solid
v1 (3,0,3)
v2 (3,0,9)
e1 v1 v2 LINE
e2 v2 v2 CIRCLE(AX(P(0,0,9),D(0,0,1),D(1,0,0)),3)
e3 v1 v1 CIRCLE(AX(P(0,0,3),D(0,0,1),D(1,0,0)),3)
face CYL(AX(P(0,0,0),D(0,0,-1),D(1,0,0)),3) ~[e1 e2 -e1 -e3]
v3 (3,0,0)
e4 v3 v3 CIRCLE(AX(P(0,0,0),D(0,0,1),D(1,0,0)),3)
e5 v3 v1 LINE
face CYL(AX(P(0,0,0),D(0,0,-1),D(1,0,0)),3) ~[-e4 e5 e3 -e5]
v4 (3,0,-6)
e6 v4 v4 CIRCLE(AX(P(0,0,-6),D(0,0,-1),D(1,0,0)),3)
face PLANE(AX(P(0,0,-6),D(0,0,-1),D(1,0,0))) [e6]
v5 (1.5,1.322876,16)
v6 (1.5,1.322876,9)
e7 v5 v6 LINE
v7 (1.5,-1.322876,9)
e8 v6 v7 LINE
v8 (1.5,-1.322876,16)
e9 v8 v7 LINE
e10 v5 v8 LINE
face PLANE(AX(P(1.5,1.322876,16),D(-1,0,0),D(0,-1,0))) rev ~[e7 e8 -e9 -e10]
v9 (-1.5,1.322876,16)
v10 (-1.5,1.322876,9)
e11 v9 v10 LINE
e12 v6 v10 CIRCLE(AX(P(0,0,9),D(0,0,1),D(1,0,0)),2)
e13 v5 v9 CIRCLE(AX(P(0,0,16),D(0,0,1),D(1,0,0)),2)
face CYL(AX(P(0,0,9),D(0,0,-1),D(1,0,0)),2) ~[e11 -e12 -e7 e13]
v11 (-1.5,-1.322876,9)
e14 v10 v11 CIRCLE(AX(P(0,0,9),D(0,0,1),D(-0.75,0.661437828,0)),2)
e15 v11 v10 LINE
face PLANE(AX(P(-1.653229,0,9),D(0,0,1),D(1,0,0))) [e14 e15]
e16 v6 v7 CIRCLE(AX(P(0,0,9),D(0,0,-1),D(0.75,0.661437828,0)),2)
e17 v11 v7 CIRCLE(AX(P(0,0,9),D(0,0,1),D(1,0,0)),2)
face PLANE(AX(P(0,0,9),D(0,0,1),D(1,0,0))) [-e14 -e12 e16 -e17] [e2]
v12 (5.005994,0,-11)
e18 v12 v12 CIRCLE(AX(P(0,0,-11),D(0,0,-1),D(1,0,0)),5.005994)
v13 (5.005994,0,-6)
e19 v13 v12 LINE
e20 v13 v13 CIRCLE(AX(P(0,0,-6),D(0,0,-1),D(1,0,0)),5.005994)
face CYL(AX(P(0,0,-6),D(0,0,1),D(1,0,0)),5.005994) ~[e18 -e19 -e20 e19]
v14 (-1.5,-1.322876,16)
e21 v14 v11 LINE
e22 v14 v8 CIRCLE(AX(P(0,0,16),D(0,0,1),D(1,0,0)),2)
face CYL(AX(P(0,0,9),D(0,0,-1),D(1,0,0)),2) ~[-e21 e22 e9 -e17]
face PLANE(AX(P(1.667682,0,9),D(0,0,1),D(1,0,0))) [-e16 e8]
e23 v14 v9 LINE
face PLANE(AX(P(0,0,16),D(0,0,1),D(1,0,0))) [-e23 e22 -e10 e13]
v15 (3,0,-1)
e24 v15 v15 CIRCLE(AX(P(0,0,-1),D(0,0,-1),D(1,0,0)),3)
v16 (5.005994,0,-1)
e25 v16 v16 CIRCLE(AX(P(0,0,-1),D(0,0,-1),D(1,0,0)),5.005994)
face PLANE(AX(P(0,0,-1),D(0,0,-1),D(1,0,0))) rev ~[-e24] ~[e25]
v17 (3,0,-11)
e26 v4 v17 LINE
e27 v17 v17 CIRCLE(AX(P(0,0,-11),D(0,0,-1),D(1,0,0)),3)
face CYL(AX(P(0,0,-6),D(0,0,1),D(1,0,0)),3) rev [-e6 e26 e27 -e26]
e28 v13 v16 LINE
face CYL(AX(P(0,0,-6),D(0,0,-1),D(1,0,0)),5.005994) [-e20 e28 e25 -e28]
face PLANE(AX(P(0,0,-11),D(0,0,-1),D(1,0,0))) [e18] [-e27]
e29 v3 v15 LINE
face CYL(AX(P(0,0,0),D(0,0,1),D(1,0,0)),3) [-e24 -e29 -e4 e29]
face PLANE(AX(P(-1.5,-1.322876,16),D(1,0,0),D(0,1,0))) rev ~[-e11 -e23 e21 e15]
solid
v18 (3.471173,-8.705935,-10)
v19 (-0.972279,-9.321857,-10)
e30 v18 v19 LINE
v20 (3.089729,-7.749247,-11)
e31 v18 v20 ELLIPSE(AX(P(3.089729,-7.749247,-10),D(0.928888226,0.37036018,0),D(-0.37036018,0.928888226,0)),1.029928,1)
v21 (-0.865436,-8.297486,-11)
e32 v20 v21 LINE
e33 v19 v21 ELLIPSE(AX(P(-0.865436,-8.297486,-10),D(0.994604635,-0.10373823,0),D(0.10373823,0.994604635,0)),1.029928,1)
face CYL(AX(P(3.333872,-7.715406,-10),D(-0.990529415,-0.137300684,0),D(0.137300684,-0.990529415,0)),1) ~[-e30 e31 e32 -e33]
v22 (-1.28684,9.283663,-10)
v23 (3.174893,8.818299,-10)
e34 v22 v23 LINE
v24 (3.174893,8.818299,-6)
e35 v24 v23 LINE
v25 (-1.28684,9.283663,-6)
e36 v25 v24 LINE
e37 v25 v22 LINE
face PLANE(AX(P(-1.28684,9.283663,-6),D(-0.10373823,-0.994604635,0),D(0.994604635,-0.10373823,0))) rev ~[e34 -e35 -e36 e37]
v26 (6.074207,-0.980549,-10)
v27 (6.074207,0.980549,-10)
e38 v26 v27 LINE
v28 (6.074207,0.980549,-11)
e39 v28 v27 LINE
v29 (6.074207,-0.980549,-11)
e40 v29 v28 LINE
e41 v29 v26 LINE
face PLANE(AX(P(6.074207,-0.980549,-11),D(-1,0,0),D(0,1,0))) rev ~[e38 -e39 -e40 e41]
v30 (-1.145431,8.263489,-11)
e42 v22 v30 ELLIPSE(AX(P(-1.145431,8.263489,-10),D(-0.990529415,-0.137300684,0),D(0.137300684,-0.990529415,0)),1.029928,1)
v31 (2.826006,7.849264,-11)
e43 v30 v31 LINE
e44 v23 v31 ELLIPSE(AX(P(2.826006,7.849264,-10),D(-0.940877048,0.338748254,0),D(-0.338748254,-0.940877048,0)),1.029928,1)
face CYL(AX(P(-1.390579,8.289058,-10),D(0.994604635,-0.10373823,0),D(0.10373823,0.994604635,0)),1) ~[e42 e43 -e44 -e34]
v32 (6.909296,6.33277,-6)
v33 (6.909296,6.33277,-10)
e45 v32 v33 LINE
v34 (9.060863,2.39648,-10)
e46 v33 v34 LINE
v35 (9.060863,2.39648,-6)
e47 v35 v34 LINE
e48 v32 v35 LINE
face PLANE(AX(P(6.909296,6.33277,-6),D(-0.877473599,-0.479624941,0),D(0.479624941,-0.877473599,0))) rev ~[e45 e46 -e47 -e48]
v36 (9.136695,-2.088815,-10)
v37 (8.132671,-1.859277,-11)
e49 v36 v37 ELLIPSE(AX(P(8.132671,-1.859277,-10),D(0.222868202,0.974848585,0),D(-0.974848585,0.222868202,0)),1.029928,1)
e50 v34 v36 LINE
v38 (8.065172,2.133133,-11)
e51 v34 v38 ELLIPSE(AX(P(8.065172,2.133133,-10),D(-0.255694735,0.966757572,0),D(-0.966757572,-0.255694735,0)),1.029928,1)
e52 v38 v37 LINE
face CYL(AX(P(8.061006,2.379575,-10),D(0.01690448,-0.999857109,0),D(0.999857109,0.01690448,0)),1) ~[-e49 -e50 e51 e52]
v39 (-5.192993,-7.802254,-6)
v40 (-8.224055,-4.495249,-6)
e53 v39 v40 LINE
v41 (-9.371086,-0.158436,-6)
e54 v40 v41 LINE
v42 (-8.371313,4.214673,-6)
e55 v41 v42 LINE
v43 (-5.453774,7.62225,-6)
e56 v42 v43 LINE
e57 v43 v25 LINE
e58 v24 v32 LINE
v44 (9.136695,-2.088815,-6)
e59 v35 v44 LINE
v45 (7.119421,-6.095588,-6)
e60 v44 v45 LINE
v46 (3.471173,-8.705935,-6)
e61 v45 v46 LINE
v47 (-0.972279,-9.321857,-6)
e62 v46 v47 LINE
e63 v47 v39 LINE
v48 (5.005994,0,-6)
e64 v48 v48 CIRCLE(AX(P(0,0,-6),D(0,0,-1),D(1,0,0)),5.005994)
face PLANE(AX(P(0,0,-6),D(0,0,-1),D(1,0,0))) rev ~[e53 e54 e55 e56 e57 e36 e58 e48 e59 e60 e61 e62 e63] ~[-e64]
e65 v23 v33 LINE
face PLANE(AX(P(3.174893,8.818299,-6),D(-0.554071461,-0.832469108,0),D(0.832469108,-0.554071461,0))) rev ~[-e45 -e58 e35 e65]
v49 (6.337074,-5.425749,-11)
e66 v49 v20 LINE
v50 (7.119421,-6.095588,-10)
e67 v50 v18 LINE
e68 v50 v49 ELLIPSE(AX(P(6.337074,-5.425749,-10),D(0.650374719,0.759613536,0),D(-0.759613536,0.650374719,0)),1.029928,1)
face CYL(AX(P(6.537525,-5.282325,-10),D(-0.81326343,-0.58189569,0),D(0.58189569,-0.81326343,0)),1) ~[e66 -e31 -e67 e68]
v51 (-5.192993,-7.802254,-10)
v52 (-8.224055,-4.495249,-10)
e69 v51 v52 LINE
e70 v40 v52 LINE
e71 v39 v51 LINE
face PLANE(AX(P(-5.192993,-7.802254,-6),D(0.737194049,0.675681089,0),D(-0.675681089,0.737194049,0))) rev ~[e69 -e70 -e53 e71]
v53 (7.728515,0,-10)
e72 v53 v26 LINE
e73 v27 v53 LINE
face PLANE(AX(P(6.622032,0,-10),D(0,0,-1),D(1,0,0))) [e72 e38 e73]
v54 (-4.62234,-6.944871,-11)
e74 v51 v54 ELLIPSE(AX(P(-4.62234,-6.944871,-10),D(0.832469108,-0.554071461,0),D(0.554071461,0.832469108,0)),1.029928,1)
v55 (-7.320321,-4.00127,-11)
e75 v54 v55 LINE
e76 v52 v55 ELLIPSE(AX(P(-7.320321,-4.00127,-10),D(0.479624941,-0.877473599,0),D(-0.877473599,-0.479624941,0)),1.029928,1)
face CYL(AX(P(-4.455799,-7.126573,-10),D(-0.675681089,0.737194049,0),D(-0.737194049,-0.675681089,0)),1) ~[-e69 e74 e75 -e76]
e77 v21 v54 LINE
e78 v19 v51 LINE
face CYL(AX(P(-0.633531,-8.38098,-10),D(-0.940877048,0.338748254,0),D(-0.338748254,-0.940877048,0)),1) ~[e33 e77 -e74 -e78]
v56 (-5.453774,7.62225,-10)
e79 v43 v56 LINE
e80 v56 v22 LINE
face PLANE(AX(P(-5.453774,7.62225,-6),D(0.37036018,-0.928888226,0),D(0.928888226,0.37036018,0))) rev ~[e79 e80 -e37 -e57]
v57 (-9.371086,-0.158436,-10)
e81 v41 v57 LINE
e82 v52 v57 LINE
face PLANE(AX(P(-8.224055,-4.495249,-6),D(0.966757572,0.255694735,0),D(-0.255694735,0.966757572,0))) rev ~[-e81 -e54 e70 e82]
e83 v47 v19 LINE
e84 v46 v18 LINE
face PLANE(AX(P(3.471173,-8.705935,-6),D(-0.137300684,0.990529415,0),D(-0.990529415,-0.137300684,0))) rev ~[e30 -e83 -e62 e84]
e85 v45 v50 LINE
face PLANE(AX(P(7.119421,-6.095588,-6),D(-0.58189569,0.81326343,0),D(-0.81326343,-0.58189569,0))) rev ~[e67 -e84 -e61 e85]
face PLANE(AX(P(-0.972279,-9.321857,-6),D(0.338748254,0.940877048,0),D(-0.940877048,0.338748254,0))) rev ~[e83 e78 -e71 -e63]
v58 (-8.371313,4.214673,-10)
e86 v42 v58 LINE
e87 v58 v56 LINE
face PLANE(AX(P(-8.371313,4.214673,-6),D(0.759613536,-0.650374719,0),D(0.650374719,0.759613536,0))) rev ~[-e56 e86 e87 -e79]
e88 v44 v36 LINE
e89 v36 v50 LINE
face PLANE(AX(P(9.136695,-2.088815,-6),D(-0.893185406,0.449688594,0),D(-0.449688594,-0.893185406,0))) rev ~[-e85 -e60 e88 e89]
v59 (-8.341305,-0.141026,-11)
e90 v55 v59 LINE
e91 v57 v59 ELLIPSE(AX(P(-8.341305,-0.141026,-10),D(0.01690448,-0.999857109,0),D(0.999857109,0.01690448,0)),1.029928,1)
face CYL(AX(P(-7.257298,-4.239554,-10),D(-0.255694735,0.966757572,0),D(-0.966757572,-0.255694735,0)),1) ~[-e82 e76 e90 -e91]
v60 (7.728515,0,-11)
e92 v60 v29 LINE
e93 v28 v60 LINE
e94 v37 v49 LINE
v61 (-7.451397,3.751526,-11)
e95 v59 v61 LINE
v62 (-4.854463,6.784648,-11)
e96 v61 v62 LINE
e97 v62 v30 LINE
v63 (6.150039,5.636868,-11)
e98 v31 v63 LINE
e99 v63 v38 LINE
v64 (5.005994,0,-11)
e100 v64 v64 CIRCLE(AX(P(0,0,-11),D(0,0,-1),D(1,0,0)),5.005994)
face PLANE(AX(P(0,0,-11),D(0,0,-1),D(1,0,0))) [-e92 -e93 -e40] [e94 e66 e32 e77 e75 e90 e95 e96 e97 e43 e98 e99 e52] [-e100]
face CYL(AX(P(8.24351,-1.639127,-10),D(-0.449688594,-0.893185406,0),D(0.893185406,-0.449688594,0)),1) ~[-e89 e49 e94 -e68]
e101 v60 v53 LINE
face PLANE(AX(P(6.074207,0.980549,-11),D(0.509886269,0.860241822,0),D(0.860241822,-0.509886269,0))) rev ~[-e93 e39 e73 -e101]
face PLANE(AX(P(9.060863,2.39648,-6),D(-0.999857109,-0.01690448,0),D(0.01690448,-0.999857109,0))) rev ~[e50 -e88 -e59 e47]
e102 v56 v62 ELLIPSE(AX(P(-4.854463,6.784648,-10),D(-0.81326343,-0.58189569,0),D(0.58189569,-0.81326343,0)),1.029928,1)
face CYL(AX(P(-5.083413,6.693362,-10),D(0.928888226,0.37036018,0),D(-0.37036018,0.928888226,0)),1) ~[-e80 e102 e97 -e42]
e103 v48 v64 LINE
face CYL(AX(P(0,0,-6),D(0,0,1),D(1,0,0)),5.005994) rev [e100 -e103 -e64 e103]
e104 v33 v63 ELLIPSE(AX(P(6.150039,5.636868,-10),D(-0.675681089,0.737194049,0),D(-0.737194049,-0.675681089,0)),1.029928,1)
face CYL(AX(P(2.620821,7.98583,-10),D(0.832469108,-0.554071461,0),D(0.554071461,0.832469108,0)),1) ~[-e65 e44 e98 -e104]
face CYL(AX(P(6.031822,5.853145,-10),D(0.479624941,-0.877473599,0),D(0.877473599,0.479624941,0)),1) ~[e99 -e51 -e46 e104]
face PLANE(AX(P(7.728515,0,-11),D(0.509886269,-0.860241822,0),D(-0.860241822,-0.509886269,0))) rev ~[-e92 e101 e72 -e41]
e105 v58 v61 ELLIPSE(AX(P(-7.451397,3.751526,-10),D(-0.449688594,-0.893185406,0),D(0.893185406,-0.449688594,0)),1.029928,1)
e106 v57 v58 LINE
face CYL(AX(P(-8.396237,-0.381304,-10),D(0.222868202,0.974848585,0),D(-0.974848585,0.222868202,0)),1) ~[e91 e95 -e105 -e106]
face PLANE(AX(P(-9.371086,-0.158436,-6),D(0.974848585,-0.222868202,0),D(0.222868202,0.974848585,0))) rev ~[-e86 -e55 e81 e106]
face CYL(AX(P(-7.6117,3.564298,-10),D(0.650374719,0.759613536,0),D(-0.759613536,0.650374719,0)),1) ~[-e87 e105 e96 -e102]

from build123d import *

# Parameters (mm, degrees)
F0_R           = 3
F1_DEPTH       = 9
F1_FACE_R      = 3
F2_DEPTH       = 6
F3_R           = 2
F4_DEPTH       = 7
F3_R_2         = 3
F5_DEPTH       = 7
F7_DEPTH       = 7
F8_R           = 5.0059936483
F9_DEPTH       = 5
F10_R          = 1
F8_R_2         = 3
F12_DEPTH      = 5
F12_DEPTH_BACK = 5
F13_DEPTH      = 1


with BuildPart() as f1:
    # F0 (on Top) → F1 (new body)
    with BuildSketch(Plane.XY):
        Circle(F0_R)
    extrude(amount=F1_DEPTH)

    # F0 (on Top) + F1_face (on face) → F2 (join)
    with BuildSketch(Plane.XY):
        Circle(F0_R)
    with BuildSketch(Plane.XY.offset(9)):
        Circle(F1_FACE_R)
    extrude(amount=-F2_DEPTH)

    # F3 (on face) → F4 (join)
    with BuildSketch(Plane.XY.offset(9)):
        Circle(F3_R)
    extrude(amount=F4_DEPTH)

    # F3 (on face) → F5 (cut)
    with BuildSketch(Plane.XY.offset(9)):
        Circle(F3_R_2)
        Circle(F3_R, mode=Mode.SUBTRACT)
    extrude(amount=F5_DEPTH, mode=Mode.SUBTRACT)

    # F6 (on face) → F7 (cut)
    with BuildSketch(Plane.XY.offset(16)):
        with BuildLine():
            Line((-1.5, -1.3228756555), (-1.5, 1.3228756555))
            ThreePointArc((-1.5, 1.3228756555), (-2, 0), (-1.5, -1.3228756555))
        make_face()
        with BuildLine():
            ThreePointArc((2, 0), (1.8708286934, 0.7071067812), (1.5, 1.3228756555))
            Line((1.5, 1.3228756555), (1.5, -1.3228756555))
            ThreePointArc((1.5, -1.3228756555), (1.8708286934, -0.7071067812), (2, 0))
        make_face()
    extrude(amount=-F7_DEPTH, mode=Mode.SUBTRACT)

    # F8 (on face) → F12 (join, two sides)
    with BuildSketch(Plane(origin=(0, 0, -6), x_dir=(1, 0, 0), z_dir=(0, 0, -1))) as f12_sk:
        Circle(F8_R)
        Circle(F8_R_2, mode=Mode.SUBTRACT)
    extrude(amount=-F12_DEPTH)
    extrude(f12_sk.sketch, amount=F12_DEPTH_BACK)


with BuildPart() as f9:
    # F8 (on face) → F9 (new body)
    with BuildSketch(Plane(origin=(0, 0, -6), x_dir=(1, 0, 0), z_dir=(0, 0, -1))):
        Polygon((-5.1929931591, 7.8022541948), (-8.2240554024, 4.4952487372), (-9.3710856636, 0.1584359675), (-8.3713131331, -4.214672573), (-5.4537736491, -7.6222504193), (-1.2868403472, -9.2836625527), (3.1748925702, -8.8182994754), (6.9092958614, -6.3327702604), (9.0608627367, -2.3964796969), (9.1366951543, 2.0888154845), (7.1194208212, 6.0955882113), (3.4711729762, 8.7059351387), (-0.9722787654, 9.3218572438), align=None)
        Circle(F8_R, mode=Mode.SUBTRACT)
    extrude(amount=F9_DEPTH)

    # F10
    f10_edges = [f9.edges().sort_by_distance(p)[0] for p in [
        (-6.708524, -6.148751, -11),
        (-3.082636, -8.562056, -11),
        (1.249447, -9.013896, -11),
        (5.295297, -7.400762, -11),
        (8.128058, -4.092202, -11),
        (9.098779, 0.153832, -11),
        (7.985079, 4.364625, -11),
        (5.042094, 7.575535, -11),
        (0.944026, 9.050981, -11),
        (-3.370307, 8.452956, -11),
        (-6.912543, 5.918461, -11),
        (-8.871199, 2.028118, -11),
        (-8.797571, -2.326842, -11),
    ]]
    fillet(f10_edges, radius=F10_R)

    # F11 (on face) → F13 (cut)
    with BuildSketch(Plane(origin=(0, 0, -11), x_dir=(1, 0, 0), z_dir=(0, 0, -1))):
        Polygon((7.7285151929, 0), (6.0742069036, 0.9805487934), (6.0742069036, -0.9805487934), align=None)
    extrude(amount=-F13_DEPTH, mode=Mode.SUBTRACT)


solid = Compound([f1.part, f9.part])
